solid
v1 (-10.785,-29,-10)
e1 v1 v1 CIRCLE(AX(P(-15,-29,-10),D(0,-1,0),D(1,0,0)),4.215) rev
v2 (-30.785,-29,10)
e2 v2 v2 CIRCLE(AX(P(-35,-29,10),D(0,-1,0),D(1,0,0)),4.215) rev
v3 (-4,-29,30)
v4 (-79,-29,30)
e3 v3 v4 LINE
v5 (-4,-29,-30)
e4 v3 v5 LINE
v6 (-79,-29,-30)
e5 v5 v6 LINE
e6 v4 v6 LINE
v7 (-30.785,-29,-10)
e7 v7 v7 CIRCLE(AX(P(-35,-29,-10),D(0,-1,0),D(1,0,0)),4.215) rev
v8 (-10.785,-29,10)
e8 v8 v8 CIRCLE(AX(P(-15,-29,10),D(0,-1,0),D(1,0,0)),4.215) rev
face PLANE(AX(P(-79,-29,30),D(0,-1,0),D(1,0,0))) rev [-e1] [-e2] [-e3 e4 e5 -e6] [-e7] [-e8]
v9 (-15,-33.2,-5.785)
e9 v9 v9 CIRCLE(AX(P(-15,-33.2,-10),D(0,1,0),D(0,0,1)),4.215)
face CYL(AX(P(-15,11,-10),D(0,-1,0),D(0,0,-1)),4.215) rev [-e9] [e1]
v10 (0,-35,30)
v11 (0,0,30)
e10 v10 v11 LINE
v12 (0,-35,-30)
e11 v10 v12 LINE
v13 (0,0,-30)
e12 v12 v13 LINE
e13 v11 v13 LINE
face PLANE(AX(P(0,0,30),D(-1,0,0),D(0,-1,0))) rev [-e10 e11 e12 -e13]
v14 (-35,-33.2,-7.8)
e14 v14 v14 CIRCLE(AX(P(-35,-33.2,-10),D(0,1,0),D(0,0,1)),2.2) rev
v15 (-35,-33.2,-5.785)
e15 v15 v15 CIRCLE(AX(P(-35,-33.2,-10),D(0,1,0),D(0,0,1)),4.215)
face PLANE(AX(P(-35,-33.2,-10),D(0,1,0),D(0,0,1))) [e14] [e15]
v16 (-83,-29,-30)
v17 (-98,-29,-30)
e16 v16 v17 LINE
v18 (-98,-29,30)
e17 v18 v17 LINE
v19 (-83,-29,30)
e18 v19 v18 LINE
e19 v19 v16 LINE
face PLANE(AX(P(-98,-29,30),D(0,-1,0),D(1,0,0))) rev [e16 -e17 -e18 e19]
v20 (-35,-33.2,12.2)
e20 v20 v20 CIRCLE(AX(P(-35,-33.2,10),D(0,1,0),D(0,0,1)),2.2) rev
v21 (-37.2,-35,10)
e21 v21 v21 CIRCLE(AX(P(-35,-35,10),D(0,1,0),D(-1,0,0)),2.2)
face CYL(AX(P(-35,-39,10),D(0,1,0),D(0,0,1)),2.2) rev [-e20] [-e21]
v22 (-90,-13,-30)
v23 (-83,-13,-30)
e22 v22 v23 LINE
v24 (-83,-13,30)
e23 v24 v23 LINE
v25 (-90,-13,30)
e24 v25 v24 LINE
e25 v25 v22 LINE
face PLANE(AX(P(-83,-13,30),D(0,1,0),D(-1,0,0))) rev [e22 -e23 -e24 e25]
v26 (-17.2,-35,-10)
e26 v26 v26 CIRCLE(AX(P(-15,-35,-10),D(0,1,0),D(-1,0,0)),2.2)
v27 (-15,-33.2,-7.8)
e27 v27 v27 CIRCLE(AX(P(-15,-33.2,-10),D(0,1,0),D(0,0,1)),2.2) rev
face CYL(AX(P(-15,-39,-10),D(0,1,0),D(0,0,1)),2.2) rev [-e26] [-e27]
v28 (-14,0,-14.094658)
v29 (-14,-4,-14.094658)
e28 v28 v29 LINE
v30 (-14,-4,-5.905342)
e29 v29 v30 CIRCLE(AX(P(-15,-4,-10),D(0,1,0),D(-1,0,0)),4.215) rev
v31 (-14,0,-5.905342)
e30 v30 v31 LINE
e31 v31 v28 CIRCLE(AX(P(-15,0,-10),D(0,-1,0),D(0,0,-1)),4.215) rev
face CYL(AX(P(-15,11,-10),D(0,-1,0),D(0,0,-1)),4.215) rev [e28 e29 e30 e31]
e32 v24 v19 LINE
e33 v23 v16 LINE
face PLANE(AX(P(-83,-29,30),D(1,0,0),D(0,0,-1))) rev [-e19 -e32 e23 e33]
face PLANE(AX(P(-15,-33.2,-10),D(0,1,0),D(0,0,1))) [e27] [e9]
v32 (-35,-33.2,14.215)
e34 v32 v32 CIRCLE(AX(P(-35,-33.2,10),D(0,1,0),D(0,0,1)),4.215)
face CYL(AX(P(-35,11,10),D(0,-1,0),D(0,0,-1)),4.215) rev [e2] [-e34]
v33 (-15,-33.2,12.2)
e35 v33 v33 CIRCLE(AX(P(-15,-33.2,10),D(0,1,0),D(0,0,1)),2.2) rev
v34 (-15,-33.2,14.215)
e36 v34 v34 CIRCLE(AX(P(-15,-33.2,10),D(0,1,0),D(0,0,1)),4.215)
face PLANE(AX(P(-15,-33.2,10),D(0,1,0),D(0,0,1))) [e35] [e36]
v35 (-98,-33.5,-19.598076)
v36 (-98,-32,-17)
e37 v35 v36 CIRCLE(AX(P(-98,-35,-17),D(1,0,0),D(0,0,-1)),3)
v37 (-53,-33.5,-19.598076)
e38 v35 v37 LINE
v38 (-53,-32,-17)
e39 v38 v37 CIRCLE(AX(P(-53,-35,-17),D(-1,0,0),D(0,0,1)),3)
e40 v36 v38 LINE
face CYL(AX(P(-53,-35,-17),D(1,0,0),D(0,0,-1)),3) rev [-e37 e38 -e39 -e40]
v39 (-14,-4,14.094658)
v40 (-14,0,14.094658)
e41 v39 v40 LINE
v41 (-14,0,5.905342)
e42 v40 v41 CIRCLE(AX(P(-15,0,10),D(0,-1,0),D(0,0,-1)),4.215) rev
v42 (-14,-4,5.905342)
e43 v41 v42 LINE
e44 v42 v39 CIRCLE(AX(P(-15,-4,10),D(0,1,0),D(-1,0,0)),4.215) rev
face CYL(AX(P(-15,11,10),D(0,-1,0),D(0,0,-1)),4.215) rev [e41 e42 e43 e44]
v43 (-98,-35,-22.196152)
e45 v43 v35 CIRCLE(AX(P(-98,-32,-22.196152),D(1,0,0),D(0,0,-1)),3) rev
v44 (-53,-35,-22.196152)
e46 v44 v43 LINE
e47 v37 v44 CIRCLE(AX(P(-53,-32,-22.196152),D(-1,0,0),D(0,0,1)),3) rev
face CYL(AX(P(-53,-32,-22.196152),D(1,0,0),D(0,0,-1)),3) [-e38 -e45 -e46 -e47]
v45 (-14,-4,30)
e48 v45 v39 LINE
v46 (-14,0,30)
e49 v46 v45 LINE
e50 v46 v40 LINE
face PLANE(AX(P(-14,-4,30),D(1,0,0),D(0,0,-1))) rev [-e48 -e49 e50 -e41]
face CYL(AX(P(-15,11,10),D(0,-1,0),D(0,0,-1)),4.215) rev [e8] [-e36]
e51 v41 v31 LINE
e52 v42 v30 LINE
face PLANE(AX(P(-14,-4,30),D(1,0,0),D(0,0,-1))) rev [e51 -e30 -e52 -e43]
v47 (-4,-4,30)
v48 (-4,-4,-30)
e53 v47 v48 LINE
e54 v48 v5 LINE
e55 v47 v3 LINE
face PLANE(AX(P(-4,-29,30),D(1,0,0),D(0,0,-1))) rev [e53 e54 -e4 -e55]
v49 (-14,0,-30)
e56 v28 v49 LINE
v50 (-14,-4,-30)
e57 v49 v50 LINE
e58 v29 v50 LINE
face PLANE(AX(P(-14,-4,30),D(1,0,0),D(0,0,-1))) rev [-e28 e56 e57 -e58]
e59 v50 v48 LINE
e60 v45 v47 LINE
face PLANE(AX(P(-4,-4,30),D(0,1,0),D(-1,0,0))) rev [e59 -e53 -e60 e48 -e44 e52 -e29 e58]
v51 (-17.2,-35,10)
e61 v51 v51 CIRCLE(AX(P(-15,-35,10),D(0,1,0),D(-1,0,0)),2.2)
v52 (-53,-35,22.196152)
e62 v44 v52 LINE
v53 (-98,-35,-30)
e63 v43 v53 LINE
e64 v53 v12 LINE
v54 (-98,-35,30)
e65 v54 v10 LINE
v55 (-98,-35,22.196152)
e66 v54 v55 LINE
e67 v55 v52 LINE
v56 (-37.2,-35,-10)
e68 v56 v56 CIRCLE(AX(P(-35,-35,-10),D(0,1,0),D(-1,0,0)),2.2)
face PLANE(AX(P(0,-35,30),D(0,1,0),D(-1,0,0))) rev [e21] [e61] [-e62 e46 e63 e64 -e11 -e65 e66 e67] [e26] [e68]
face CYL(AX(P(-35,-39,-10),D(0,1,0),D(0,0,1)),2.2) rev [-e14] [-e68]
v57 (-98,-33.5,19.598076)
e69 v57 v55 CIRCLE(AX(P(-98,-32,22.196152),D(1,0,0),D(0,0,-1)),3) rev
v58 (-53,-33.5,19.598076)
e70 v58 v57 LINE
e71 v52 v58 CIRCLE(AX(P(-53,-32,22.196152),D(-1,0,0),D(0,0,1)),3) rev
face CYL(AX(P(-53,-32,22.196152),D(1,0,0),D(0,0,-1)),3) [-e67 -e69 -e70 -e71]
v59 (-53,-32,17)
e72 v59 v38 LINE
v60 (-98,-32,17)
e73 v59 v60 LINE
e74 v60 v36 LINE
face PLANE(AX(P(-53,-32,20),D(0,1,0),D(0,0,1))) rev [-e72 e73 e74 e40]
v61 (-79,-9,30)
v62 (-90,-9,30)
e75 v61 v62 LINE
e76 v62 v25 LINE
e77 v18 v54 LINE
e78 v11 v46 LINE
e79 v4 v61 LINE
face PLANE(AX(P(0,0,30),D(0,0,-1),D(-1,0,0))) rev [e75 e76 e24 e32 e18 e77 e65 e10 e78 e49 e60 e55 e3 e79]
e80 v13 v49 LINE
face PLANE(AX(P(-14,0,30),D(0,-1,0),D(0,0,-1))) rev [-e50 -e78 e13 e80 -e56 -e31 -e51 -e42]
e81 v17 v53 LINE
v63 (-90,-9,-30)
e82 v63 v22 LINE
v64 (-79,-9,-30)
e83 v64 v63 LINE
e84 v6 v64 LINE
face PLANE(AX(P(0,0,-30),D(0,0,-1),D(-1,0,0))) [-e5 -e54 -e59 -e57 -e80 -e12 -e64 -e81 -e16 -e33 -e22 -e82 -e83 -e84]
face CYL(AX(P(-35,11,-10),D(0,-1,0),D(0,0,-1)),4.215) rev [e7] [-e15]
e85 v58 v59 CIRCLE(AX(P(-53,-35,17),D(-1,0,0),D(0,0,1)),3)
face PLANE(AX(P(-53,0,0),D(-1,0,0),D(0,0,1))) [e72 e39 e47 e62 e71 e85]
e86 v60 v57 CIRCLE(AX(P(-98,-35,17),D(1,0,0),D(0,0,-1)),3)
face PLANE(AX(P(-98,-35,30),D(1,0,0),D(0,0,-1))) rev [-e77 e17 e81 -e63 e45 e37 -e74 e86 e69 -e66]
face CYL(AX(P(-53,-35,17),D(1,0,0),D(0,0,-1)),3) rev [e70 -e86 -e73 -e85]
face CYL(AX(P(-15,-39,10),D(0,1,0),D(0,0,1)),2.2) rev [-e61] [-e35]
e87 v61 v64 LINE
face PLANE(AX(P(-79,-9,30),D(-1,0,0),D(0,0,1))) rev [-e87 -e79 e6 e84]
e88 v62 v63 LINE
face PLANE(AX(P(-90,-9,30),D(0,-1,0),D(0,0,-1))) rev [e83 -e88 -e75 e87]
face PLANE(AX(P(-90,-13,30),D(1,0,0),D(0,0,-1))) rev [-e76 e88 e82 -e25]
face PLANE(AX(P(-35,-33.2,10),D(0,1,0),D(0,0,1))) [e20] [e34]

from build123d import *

# Parameters (mm, degrees)
EXTRUDE_BASE_DEPTH              = 30
SKETCH2_R                       = 2.2
CUT_BOLT_HOLES_DEPTH            = 10
CUT_BOLT_HEAD_INSETS_DEPTH      = 40
CUT_BOLT_HEAD_INSETS_DEPTH_BACK = 4.2
SKETCH3_R                       = 4.215
SKETCH4_W                       = 40
SKETCH4_H                       = 3
CUT_TOP_CLEARANCE_SLOT_DEPTH    = 45
FILLET_CLEARANCE_SLOT_PT_1_R    = 3
FILLET_CLEARANCE_SLOT_PT_2_R    = 3


# Some blends are built 0.0001 mm under size
with BuildPart() as part:
    # Sketch1 → Extrude-Base (new, symmetric)
    with BuildSketch(Plane.XY):
        Polygon((-14, 0), (0, 0), (0, -35), (-98, -35), (-98, -29), (-83, -29), (-83, -13), (-90, -13), (-90, -9), (-79, -9), (-79, -29), (-4, -29), (-4, -4), (-14, -4), align=None)
    extrude(amount=EXTRUDE_BASE_DEPTH, both=True)

    # Sketch2 → Cut-Bolt Holes (cut)
    with BuildSketch(Plane(origin=(0, -29, 0), x_dir=(1, 0, 0), z_dir=(0, 1, 0))):
        with Locations(Location((-15, -10, 0), (0, 0, 270))):
            Circle(SKETCH2_R)
        with Locations(Location((-15, 10, 0), (0, 0, 270))):
            Circle(SKETCH2_R)
        with Locations(Location((-35, 10, 0), (0, 0, 270))):
            Circle(SKETCH2_R)
        with Locations(Location((-35, -10, 0), (0, 0, 270))):
            Circle(SKETCH2_R)
    extrude(amount=-CUT_BOLT_HOLES_DEPTH, mode=Mode.SUBTRACT)

    # Sketch3 → Cut-Bolt Head Insets (cut, two sides: drawn at the far end of the back side and taken through both)
    with BuildSketch(Plane(origin=(0, -29, 0), x_dir=(1, 0, 0), z_dir=(0, 1, 0)).offset(-CUT_BOLT_HEAD_INSETS_DEPTH_BACK)):
        with Locations((-35, 10)):
            Circle(SKETCH3_R)
        with Locations((-15, 10)):
            Circle(SKETCH3_R)
        with Locations((-15, -10)):
            Circle(SKETCH3_R)
        with Locations((-35, -10)):
            Circle(SKETCH3_R)
    extrude(amount=CUT_BOLT_HEAD_INSETS_DEPTH + CUT_BOLT_HEAD_INSETS_DEPTH_BACK, mode=Mode.SUBTRACT)

    # Sketch4 → Cut-Top Clearance Slot (cut)
    with BuildSketch(Plane.ZY.offset(98)):
        with Locations((0, -33.5)):
            Rectangle(SKETCH4_W, SKETCH4_H)
    extrude(amount=-CUT_TOP_CLEARANCE_SLOT_DEPTH, mode=Mode.SUBTRACT)

    # Fillet-Clearance Slot Pt 1
    fillet_clearance_slot_pt_1_edges = [part.edges().sort_by_distance(p)[0] for p in [
        (-75.5, -32, 20),
        (-75.5, -32, -20),
    ]]
    fillet(fillet_clearance_slot_pt_1_edges, radius=FILLET_CLEARANCE_SLOT_PT_1_R - 0.0001)  # a hair under: the kernel refuses the full size

    # Fillet-Clearance Slot Pt 2
    # the kernel refuses this fillet: 3 mm, written as the material it takes off along each edge
    with BuildSketch(Plane(origin=(-103.490486718, -35, 20), x_dir=(0, 0, 1), z_dir=(1, 0, 0))) as fillet_clearance_slot_pt_2_piece_1:
        with BuildLine():
            CenterArc((2.196194687, -3), FILLET_CLEARANCE_SLOT_PT_2_R, 90, 60.000551337)
            Line((-0.401895958, -1.500025), (-0.661705022, -1.3500275))
            ThreePointArc((-0.661705022, -1.3500275), (-0.3, -0.0001), (-0.3, 0))
            Line((-0.3, 0), (0, 0.3))
            Line((0, 0.3), (2.196194687, 0.3))
            Line((2.196194687, 0.3), (2.196194687, 0))
        make_face()
    extrude(amount=50.490486718, mode=Mode.SUBTRACT)
    with BuildSketch(Plane(origin=(-103.490486718, -35, -20), x_dir=(0, 0.9659313848535176, 0.25879829936644777), z_dir=(1, 0, 0))) as fillet_clearance_slot_pt_2_piece_2:
        with BuildLine():
            CenterArc((2.329422704, -2.897768274), FILLET_CLEARANCE_SLOT_PT_2_R, 105.000679234, 60.000551337)
            Line((-0.56837145, -2.121373376), (-0.858150866, -2.043733886))
            Line((-0.858150866, -2.043733886), (-0.289779415, 0.07763949))
            Line((-0.289779415, 0.07763949), (0.07763949, 0.289779415))
            ThreePointArc((0.07763949, 0.289779415), (0.077736083, 0.289753536), (1.475282068, 0.289776827))
            Line((1.475282068, 0.289776827), (1.552931216, 0))
        make_face()
    extrude(amount=50.490486718, mode=Mode.SUBTRACT)


solid = part.part
